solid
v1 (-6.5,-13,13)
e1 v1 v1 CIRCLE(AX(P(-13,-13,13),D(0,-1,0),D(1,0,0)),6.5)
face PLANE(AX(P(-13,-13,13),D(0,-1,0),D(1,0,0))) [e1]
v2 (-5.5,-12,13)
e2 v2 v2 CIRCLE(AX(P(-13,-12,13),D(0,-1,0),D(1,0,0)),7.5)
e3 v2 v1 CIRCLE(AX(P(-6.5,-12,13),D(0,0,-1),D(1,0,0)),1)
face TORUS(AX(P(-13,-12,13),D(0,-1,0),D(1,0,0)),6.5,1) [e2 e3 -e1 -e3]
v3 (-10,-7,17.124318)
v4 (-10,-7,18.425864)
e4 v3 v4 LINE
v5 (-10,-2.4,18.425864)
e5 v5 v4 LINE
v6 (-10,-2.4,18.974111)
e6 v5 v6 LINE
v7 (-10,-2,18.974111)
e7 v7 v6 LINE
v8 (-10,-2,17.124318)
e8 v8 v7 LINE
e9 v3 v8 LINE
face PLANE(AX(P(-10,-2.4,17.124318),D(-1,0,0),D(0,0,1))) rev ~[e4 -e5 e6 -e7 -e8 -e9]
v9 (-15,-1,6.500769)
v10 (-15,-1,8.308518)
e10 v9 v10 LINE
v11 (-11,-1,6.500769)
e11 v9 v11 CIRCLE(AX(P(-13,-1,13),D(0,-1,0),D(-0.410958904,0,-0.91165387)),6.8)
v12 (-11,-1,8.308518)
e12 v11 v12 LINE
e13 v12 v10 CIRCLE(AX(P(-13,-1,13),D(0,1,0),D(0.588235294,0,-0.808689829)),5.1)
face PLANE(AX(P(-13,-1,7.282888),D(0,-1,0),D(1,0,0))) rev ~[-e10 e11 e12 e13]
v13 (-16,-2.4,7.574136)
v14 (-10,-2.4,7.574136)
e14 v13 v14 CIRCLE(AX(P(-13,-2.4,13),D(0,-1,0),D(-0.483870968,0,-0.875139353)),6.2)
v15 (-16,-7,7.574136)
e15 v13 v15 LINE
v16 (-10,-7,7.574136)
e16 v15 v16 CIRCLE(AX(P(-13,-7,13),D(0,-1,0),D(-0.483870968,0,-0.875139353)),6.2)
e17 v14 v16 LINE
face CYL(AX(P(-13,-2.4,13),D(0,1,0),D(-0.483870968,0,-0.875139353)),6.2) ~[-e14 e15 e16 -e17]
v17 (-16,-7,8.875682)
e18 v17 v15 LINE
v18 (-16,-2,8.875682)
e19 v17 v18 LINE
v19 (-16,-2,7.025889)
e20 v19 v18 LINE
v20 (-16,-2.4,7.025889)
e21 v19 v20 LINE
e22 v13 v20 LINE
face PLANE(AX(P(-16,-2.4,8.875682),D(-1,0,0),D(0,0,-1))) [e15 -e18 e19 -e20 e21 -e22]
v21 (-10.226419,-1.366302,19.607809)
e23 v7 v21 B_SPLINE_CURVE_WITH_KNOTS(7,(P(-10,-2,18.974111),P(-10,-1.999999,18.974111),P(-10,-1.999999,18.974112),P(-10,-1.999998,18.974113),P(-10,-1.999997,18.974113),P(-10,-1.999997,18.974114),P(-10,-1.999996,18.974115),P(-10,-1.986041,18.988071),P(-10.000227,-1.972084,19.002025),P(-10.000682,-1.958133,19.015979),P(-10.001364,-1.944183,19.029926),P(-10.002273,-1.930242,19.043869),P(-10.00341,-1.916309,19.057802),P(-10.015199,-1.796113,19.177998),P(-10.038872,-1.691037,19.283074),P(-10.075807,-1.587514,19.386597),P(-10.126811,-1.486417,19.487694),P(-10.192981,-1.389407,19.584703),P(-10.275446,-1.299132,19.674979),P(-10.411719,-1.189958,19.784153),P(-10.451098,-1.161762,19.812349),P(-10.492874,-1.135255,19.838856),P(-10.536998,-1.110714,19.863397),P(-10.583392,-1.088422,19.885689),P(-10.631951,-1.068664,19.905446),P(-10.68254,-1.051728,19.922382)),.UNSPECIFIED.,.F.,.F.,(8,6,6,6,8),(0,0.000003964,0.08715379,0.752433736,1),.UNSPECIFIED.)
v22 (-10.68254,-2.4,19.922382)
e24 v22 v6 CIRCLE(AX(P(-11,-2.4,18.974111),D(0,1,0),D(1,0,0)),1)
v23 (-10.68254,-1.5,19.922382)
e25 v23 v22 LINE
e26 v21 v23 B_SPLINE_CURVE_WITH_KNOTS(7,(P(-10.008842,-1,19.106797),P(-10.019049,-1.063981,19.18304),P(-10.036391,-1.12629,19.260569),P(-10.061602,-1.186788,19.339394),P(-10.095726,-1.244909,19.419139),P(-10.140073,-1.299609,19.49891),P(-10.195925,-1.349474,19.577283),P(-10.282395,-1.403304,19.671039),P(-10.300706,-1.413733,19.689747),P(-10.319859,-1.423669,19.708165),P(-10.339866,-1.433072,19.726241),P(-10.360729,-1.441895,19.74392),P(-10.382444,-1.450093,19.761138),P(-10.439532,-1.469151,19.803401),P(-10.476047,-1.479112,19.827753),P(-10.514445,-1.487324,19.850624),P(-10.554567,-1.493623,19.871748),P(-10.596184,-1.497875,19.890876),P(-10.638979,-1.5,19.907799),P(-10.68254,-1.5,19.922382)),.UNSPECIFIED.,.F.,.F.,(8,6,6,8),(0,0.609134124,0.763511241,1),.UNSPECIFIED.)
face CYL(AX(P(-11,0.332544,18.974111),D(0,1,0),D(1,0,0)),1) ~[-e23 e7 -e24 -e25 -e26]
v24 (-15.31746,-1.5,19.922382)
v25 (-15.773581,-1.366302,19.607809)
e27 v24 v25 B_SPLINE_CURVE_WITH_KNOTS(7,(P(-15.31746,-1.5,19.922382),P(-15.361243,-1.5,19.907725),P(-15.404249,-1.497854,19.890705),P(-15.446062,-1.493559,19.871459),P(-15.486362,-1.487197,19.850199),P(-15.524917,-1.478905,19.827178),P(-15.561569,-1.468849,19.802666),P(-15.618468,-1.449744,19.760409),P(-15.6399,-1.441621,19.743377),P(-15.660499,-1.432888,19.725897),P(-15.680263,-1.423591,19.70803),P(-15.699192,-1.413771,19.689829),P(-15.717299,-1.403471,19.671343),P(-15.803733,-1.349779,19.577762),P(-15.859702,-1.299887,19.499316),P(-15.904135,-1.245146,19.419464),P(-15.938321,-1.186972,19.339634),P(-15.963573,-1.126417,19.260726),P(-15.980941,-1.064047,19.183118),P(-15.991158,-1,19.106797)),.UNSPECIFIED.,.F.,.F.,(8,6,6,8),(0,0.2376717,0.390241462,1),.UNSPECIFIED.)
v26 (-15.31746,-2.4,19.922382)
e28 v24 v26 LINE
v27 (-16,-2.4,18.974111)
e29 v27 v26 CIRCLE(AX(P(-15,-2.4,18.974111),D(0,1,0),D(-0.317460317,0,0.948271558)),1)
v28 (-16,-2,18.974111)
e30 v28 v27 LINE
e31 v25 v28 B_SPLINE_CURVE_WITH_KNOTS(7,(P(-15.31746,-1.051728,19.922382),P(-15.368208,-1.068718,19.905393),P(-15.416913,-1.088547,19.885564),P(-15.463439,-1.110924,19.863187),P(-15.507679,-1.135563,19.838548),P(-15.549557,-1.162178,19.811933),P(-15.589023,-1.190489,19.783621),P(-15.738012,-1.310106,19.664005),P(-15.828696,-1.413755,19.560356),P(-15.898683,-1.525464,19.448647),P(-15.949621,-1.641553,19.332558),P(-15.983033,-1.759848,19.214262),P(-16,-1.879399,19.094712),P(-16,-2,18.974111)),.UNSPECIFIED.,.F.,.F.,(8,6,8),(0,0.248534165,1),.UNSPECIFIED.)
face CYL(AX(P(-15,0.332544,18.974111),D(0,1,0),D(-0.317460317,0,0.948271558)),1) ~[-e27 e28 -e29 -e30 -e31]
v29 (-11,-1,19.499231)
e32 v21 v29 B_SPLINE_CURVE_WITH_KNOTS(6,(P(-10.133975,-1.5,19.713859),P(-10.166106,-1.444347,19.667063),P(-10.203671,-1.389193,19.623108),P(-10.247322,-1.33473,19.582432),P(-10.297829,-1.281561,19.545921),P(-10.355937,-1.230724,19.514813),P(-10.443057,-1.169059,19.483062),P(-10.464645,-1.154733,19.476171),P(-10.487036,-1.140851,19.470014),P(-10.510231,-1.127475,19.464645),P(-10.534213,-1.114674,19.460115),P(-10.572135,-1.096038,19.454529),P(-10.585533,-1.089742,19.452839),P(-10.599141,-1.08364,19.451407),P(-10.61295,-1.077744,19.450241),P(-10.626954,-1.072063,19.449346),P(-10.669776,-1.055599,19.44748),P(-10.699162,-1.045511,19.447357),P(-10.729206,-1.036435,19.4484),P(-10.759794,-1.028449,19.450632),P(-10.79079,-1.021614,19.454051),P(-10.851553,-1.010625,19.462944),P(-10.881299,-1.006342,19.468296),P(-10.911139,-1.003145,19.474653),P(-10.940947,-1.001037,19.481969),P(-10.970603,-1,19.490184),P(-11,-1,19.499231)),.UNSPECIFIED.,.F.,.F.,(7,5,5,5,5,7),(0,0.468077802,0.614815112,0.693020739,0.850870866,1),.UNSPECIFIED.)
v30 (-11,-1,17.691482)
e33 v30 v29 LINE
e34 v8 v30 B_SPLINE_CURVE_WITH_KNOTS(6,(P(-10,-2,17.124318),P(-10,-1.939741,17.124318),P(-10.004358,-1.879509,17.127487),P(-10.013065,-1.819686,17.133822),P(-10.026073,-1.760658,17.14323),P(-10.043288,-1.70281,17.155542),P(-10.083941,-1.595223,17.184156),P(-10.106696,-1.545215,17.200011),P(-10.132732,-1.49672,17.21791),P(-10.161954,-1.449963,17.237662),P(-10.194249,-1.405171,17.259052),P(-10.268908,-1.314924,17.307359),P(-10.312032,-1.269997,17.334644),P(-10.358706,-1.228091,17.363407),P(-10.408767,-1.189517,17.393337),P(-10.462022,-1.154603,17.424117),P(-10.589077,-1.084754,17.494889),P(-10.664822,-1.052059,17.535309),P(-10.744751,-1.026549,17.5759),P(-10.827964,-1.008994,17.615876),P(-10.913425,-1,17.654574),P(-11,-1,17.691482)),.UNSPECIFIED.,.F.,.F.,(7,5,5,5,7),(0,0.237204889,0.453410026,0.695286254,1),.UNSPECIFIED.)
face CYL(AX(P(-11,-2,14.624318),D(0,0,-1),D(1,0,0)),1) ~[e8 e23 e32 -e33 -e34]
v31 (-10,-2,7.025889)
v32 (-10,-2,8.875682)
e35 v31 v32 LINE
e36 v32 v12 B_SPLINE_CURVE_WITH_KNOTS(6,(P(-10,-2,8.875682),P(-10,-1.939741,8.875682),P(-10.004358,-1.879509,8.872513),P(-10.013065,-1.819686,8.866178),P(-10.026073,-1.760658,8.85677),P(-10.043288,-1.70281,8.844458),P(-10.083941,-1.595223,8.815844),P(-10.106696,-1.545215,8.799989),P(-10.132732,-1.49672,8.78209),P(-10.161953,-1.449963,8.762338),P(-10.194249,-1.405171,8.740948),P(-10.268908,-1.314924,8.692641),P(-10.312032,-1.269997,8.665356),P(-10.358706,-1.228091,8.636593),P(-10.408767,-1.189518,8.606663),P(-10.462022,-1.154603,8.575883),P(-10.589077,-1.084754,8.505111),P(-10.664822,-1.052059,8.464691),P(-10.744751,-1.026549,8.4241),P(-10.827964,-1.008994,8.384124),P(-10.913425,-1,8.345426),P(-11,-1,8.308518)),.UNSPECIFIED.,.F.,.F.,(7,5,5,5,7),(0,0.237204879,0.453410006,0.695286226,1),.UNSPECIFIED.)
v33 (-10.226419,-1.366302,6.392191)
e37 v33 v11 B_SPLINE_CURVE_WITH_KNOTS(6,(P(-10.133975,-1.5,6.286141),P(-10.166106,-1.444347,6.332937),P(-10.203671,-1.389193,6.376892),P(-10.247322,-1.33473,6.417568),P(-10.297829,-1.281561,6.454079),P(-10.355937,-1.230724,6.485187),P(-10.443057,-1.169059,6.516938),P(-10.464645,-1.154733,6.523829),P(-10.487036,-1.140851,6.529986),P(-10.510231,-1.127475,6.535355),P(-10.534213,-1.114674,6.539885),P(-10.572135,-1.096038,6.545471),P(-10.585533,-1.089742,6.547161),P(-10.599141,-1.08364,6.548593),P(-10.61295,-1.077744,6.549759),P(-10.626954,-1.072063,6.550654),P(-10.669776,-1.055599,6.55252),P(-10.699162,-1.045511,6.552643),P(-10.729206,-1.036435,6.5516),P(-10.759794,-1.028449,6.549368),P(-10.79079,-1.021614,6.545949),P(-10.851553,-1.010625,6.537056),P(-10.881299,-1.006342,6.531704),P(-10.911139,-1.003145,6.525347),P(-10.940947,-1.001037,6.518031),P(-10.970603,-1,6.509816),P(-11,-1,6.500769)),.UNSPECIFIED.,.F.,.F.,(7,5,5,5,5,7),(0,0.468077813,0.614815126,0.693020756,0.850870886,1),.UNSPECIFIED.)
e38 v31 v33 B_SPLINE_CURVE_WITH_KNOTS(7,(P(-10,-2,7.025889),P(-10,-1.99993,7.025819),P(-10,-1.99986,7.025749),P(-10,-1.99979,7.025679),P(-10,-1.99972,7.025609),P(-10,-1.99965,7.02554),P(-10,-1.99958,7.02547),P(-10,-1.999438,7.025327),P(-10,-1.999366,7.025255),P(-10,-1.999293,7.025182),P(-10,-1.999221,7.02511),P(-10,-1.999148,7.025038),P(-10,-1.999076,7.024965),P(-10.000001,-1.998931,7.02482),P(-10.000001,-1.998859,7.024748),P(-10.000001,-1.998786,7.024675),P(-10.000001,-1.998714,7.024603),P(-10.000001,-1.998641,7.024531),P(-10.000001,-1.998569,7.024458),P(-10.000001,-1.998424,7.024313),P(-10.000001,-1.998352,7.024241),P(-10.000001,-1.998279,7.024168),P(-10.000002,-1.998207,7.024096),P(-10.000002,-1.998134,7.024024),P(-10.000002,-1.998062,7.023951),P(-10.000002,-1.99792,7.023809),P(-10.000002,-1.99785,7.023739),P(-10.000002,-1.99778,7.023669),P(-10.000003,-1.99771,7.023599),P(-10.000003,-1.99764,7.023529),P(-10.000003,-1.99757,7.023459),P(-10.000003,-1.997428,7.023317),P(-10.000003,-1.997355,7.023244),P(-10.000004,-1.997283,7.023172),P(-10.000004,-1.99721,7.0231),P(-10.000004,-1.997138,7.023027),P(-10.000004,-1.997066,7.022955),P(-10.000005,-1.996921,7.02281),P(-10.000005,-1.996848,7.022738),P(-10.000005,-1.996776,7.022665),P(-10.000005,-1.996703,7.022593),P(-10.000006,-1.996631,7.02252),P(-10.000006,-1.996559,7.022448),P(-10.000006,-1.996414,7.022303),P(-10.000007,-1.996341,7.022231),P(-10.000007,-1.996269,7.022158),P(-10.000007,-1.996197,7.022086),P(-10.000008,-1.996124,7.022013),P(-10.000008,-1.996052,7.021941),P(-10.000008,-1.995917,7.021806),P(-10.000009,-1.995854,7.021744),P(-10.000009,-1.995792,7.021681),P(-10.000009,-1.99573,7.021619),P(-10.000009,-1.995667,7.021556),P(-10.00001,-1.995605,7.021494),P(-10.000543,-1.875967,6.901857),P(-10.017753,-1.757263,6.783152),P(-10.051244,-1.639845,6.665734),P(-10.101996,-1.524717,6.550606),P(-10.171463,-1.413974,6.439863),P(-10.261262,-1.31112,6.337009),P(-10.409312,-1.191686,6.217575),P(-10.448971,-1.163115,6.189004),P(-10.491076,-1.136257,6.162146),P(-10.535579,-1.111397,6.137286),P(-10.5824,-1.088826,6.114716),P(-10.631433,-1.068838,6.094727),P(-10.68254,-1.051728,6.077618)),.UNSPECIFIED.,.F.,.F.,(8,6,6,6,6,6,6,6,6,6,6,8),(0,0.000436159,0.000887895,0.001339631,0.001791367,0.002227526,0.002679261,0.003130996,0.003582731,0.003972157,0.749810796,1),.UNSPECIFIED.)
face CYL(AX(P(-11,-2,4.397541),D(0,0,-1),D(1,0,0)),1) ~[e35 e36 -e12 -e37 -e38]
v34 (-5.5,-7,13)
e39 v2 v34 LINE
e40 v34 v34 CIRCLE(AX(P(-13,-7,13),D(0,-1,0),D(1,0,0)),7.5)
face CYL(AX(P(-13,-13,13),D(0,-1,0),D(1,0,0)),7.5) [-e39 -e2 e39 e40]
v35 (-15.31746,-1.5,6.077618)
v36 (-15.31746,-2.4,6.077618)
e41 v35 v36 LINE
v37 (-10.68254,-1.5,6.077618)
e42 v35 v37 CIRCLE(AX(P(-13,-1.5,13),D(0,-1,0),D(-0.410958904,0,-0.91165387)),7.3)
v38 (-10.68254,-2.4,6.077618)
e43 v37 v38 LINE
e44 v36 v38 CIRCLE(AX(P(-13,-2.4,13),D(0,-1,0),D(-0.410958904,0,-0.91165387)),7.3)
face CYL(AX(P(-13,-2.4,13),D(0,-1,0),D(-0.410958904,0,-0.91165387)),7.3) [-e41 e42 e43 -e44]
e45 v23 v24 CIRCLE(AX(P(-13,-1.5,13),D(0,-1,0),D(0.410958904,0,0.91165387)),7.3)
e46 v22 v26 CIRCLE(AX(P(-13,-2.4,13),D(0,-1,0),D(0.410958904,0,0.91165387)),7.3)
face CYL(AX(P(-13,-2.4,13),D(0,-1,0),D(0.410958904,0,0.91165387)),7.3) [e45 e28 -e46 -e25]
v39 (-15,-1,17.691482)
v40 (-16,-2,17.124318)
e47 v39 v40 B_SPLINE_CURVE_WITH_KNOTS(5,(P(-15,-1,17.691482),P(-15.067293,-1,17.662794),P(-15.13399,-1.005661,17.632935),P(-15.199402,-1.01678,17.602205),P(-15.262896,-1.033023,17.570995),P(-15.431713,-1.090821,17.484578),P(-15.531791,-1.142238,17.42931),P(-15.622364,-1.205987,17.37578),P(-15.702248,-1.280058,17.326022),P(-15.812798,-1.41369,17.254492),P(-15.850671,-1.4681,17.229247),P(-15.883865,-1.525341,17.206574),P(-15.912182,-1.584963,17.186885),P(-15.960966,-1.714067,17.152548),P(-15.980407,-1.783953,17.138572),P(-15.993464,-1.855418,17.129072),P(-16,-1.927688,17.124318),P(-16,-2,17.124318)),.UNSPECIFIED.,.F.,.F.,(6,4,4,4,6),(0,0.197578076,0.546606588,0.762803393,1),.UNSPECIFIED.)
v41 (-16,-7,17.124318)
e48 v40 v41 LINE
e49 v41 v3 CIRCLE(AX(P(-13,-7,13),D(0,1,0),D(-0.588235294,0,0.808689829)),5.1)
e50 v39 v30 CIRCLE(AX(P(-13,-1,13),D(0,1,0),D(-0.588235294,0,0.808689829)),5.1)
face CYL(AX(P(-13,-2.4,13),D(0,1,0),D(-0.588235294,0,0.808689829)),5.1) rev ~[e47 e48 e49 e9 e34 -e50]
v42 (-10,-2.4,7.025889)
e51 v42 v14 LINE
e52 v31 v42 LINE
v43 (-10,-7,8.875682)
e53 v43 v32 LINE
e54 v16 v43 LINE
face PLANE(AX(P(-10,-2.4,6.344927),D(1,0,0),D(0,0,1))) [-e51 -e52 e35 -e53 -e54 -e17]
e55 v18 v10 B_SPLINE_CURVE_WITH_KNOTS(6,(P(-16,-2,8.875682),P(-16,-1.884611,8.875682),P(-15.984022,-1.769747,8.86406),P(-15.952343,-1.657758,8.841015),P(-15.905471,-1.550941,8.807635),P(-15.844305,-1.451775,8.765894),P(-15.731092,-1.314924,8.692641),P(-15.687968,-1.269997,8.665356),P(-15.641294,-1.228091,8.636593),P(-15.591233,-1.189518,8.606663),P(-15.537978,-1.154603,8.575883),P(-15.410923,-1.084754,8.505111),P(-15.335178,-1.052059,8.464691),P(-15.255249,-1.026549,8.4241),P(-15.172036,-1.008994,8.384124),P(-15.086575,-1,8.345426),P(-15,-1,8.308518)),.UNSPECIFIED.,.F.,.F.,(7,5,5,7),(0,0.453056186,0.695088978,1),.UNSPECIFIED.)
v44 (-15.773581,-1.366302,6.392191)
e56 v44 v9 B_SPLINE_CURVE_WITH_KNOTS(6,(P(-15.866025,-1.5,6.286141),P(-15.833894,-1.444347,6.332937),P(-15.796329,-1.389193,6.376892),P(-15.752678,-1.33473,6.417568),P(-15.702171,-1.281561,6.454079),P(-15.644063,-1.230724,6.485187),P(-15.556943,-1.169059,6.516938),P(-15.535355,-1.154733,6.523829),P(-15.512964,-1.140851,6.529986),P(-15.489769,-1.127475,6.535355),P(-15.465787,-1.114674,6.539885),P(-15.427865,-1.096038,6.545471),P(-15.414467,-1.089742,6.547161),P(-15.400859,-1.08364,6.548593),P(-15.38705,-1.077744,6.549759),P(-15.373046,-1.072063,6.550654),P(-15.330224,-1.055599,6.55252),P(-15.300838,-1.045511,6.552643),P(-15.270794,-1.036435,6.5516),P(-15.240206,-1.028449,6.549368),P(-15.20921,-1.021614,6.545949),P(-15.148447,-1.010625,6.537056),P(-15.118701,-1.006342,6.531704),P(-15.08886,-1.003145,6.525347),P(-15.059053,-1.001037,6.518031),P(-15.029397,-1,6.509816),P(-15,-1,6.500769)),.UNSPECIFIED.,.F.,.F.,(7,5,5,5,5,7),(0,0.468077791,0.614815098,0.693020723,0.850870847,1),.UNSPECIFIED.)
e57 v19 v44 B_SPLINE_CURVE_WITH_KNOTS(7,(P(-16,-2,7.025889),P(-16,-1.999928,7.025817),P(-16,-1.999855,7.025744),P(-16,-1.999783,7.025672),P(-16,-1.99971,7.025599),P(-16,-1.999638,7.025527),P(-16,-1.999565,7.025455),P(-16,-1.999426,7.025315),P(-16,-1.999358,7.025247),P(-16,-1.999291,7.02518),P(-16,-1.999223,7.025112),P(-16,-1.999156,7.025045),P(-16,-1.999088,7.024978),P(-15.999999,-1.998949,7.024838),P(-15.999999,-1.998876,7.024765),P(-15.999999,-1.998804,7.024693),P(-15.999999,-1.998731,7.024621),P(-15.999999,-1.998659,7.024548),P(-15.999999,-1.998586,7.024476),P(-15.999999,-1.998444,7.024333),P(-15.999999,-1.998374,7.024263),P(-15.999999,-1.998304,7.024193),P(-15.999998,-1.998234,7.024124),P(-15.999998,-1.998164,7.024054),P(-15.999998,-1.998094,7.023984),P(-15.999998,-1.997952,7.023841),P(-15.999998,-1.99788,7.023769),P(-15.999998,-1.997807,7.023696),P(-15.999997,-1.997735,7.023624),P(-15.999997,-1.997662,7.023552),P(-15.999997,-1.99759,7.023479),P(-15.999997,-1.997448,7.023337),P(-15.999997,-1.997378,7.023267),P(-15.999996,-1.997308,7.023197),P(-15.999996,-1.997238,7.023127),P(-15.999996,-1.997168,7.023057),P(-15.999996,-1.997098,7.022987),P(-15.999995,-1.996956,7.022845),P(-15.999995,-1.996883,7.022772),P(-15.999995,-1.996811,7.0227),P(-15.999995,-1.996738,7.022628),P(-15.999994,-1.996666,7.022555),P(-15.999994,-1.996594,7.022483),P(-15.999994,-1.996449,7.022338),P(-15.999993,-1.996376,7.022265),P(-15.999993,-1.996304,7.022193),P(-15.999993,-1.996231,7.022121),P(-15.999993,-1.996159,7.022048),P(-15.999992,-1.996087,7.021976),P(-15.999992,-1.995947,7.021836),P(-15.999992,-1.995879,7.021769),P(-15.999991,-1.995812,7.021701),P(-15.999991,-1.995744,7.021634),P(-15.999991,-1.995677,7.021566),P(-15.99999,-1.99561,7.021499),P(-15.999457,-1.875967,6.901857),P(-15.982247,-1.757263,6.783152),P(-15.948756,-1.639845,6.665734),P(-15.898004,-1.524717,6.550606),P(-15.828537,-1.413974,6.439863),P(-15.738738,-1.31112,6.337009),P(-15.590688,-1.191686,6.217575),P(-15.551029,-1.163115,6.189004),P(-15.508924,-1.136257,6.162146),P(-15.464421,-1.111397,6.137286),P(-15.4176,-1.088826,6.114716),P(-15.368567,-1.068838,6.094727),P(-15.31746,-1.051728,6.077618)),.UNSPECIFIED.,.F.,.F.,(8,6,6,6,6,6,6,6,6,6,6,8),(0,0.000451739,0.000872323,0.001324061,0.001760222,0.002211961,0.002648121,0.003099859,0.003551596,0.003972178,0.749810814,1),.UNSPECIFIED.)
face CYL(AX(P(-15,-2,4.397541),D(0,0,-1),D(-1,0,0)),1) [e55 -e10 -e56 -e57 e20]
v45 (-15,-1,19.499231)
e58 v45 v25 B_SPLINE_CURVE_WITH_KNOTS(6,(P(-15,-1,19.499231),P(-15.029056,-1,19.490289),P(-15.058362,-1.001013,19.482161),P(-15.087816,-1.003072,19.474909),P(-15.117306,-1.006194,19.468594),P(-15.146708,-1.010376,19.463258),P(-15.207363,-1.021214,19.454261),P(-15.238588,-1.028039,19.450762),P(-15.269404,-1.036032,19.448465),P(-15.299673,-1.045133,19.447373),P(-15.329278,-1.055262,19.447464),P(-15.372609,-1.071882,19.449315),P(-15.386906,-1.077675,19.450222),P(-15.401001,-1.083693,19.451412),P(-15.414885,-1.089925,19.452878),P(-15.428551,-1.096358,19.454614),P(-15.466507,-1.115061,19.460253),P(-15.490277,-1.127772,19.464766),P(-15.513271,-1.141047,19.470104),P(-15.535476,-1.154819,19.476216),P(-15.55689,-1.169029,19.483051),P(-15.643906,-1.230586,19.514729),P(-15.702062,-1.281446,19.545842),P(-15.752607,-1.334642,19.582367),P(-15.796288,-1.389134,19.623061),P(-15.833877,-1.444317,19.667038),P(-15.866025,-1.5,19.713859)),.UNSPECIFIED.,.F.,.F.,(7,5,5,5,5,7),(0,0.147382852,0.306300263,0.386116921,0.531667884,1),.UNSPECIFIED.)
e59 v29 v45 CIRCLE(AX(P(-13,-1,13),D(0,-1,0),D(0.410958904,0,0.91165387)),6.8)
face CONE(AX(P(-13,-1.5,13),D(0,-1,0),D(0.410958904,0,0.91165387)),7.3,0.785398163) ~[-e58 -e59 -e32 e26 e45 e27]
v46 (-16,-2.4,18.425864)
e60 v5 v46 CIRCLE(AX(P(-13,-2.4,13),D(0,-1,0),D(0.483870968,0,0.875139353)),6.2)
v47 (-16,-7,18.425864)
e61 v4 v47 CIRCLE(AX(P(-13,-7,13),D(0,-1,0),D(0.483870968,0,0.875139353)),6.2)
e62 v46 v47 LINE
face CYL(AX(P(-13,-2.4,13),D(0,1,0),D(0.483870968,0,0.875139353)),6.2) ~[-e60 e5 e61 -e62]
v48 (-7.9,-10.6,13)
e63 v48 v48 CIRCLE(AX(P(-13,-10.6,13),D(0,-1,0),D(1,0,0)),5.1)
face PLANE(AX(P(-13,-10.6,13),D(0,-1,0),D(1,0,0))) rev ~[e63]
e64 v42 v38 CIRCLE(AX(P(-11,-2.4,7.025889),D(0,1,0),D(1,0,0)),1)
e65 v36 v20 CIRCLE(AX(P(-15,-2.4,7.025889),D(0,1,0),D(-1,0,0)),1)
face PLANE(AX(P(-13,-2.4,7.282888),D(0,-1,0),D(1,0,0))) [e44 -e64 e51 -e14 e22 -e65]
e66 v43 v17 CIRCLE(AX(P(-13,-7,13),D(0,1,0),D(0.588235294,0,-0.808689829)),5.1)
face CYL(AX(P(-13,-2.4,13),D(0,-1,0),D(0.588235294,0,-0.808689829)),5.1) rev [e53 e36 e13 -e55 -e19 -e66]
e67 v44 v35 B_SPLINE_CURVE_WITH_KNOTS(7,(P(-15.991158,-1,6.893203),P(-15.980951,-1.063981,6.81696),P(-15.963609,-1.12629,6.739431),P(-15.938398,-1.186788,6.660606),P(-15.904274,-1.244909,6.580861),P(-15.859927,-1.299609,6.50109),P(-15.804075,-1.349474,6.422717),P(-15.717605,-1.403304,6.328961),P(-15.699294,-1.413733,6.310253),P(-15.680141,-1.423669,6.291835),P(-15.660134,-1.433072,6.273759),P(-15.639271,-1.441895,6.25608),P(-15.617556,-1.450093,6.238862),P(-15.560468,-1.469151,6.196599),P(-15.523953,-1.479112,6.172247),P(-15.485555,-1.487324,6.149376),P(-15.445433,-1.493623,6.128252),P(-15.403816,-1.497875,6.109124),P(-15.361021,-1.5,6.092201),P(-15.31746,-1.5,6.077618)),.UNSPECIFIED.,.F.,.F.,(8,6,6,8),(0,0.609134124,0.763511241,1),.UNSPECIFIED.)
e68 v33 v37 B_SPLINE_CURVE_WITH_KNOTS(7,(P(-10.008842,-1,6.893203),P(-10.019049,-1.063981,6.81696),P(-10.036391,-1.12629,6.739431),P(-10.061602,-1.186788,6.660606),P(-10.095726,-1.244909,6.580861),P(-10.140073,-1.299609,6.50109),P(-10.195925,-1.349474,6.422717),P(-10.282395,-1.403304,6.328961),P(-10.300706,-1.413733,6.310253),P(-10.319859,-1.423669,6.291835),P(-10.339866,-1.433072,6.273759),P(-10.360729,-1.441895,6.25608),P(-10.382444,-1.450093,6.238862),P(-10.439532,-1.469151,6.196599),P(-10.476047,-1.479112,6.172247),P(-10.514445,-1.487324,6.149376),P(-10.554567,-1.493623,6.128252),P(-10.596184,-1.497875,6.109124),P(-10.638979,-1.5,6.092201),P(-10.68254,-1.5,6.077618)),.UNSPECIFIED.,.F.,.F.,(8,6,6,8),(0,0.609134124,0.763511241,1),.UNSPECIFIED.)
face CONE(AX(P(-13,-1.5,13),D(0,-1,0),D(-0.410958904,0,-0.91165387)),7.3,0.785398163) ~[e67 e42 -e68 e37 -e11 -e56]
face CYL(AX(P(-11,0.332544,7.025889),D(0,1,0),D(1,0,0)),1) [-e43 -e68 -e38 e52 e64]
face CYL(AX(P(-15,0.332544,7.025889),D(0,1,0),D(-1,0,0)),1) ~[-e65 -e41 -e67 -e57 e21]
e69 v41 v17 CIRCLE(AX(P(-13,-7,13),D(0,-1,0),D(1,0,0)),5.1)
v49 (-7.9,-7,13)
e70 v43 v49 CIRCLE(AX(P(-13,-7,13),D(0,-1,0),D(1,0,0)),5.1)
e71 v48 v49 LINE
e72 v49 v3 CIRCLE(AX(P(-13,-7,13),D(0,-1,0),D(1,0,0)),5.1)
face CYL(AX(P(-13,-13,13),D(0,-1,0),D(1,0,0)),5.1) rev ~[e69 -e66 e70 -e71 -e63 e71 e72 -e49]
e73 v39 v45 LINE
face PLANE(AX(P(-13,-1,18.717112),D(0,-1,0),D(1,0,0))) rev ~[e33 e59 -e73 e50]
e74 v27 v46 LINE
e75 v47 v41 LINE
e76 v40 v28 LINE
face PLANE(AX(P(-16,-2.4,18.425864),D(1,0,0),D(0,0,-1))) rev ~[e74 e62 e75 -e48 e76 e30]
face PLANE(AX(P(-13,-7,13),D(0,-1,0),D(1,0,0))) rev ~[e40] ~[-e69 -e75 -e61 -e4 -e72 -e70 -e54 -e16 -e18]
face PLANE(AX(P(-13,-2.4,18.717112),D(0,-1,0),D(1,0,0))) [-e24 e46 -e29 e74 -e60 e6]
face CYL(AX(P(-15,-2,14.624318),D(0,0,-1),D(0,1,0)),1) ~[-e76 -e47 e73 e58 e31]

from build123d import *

# Parameters (mm, degrees)
F1_R         = 7.5
F2_DEPTH     = 6
F3_R         = 1
F4_T         = -2.4
F7_DEPTH     = 4.6
F9_DEPTH     = 1.4
F10_SIZE     = 0.5
F11_T1_DEPTH = 4.5650872514
F11_T3_DEPTH = 6.9781403955
F11_T5_DEPTH = 6.9781403955


# Not quite as in the source:
# - a fillet or chamfer that OpenCascade refuses, or shapes differently, is made with other operations: its cross-section is extruded or revolved along the edge and cut away or added


with BuildPart() as f2:
    # F1 (on offset) → F2 (new body)
    with BuildSketch(Plane.XZ.offset(13)):
        with Locations((-13, 13)):
            Circle(F1_R)
    extrude(amount=-F2_DEPTH)

    # F3
    f3_edges = [f2.edges().sort_by_distance(p)[0] for p in [
        (-20.5, -13, 13),
    ]]
    fillet(f3_edges, radius=F3_R)

    # F4
    f4_openings = [f2.faces().sort_by_distance(p)[0] for p in [
        (-13, -7, 13),
    ]]
    offset(amount=F4_T, openings=f4_openings)

    # F6 (on offset) → F7 (join, through all)
    with BuildSketch(Plane.XZ.offset(2.4)):
        with BuildLine():
            Line((-10, 17.1243181255), (-10, 18.4258639865))
            ThreePointArc((-10, 18.4258639865), (-13, 19.2), (-16, 18.4258639865))
            Line((-16, 18.4258639865), (-16, 17.1243181255))
            ThreePointArc((-16, 17.1243181255), (-13, 18.1), (-10, 17.1243181255))
        make_face()
        with BuildLine():
            ThreePointArc((-10, 8.8756818745), (-13, 7.9), (-16, 8.8756818745))
            Line((-16, 8.8756818745), (-16, 7.5741360135))
            ThreePointArc((-16, 7.5741360135), (-13, 6.8), (-10, 7.5741360135))
            Line((-10, 7.5741360135), (-10, 8.8756818745))
        make_face()
    extrude(amount=F7_DEPTH)

    # F8 (on offset) → F9 (join)
    with BuildSketch(Plane.XZ.offset(2.4)):
        with BuildLine():
            Line((-16, 8.8756818745), (-16, 6.3449267472))
            ThreePointArc((-16, 6.3449267472), (-13, 5.7), (-10, 6.3449267472))
            Line((-10, 6.3449267472), (-10, 8.8756818745))
            ThreePointArc((-10, 8.8756818745), (-13, 7.9), (-16, 8.8756818745))
        make_face()
        with BuildLine():
            Line((-10, 17.1243181255), (-10, 19.6550732528))
            ThreePointArc((-10, 19.6550732528), (-13, 20.3), (-16, 19.6550732528))
            Line((-16, 19.6550732528), (-16, 17.1243181255))
            ThreePointArc((-16, 17.1243181255), (-13, 18.1), (-10, 17.1243181255))
        make_face()
    extrude(amount=-F9_DEPTH)

    # F10
    f10_edges = [f2.edges().sort_by_distance(p)[0] for p in [
        (-13, -1, 5.7),
        (-13, -1, 20.3),
    ]]
    chamfer(f10_edges, length=F10_SIZE)

    # F11: fillet of radius 1 on 8 edges, made by hand

    # F11_s2 → F11_t1 (cut)
    with BuildSketch(Plane.XZ.offset(-0.3325436257)):
        with BuildLine():
            ThreePointArc((-10, 18.9741108125), (-10.1883780691, 19.5582938671), (-10.6825396825, 19.92238237))
            ThreePointArc((-10.6825396825, 19.92238237), (-10.3379125488, 19.7973002289), (-10, 19.6550732528))
            Line((-10, 19.6550732528), (-10, 18.9741108125))
        make_face()
        with BuildLine():
            ThreePointArc((-15.3174603175, 19.92238237), (-15.8116219309, 19.5582938671), (-16, 18.9741108125))
            Line((-16, 18.9741108125), (-16, 19.6550732528))
            ThreePointArc((-16, 19.6550732528), (-15.6620874512, 19.7973002289), (-15.3174603175, 19.92238237))
        make_face()
        with BuildLine():
            ThreePointArc((-10, 7.0258891875), (-10.1883780691, 6.4417061329), (-10.6825396825, 6.07761763))
            ThreePointArc((-10.6825396825, 6.07761763), (-10.3379125488, 6.2026997711), (-10, 6.3449267472))
            Line((-10, 6.3449267472), (-10, 7.0258891875))
        make_face()
        with BuildLine():
            ThreePointArc((-16, 7.0258891875), (-15.8116219309, 6.4417061329), (-15.3174603175, 6.07761763))
            ThreePointArc((-15.3174603175, 6.07761763), (-15.6620874512, 6.2026997711), (-16, 6.3449267472))
            Line((-16, 6.3449267472), (-16, 7.0258891875))
        make_face()
    extrude(amount=F11_T1_DEPTH, mode=Mode.SUBTRACT)

    # F11_s4 → F11_t3 (cut)
    with BuildSketch(Plane.XY.offset(14.6243181255)):
        with BuildLine():
            ThreePointArc((-10, -2), (-10.2928932188, -1.2928932188), (-11, -1))
            Line((-11, -1), (-10, -1))
            Line((-10, -1), (-10, -2))
        make_face()
        with BuildLine():
            ThreePointArc((-15, -1), (-15.7071067812, -1.2928932188), (-16, -2))
            Line((-16, -2), (-16, -1))
            Line((-16, -1), (-15, -1))
        make_face()
    extrude(amount=F11_T3_DEPTH, mode=Mode.SUBTRACT)

    # F11_s6 → F11_t5 (cut)
    with BuildSketch(Plane.XY.offset(4.397541479)):
        with BuildLine():
            ThreePointArc((-16, -2), (-15.7071067812, -1.2928932188), (-15, -1))
            Line((-15, -1), (-16, -1))
            Line((-16, -1), (-16, -2))
        make_face()
        with BuildLine():
            ThreePointArc((-10, -2), (-10.2928932188, -1.2928932188), (-11, -1))
            Line((-11, -1), (-10, -1))
            Line((-10, -1), (-10, -2))
        make_face()
    extrude(amount=F11_T5_DEPTH, mode=Mode.SUBTRACT)


solid = f2.part
